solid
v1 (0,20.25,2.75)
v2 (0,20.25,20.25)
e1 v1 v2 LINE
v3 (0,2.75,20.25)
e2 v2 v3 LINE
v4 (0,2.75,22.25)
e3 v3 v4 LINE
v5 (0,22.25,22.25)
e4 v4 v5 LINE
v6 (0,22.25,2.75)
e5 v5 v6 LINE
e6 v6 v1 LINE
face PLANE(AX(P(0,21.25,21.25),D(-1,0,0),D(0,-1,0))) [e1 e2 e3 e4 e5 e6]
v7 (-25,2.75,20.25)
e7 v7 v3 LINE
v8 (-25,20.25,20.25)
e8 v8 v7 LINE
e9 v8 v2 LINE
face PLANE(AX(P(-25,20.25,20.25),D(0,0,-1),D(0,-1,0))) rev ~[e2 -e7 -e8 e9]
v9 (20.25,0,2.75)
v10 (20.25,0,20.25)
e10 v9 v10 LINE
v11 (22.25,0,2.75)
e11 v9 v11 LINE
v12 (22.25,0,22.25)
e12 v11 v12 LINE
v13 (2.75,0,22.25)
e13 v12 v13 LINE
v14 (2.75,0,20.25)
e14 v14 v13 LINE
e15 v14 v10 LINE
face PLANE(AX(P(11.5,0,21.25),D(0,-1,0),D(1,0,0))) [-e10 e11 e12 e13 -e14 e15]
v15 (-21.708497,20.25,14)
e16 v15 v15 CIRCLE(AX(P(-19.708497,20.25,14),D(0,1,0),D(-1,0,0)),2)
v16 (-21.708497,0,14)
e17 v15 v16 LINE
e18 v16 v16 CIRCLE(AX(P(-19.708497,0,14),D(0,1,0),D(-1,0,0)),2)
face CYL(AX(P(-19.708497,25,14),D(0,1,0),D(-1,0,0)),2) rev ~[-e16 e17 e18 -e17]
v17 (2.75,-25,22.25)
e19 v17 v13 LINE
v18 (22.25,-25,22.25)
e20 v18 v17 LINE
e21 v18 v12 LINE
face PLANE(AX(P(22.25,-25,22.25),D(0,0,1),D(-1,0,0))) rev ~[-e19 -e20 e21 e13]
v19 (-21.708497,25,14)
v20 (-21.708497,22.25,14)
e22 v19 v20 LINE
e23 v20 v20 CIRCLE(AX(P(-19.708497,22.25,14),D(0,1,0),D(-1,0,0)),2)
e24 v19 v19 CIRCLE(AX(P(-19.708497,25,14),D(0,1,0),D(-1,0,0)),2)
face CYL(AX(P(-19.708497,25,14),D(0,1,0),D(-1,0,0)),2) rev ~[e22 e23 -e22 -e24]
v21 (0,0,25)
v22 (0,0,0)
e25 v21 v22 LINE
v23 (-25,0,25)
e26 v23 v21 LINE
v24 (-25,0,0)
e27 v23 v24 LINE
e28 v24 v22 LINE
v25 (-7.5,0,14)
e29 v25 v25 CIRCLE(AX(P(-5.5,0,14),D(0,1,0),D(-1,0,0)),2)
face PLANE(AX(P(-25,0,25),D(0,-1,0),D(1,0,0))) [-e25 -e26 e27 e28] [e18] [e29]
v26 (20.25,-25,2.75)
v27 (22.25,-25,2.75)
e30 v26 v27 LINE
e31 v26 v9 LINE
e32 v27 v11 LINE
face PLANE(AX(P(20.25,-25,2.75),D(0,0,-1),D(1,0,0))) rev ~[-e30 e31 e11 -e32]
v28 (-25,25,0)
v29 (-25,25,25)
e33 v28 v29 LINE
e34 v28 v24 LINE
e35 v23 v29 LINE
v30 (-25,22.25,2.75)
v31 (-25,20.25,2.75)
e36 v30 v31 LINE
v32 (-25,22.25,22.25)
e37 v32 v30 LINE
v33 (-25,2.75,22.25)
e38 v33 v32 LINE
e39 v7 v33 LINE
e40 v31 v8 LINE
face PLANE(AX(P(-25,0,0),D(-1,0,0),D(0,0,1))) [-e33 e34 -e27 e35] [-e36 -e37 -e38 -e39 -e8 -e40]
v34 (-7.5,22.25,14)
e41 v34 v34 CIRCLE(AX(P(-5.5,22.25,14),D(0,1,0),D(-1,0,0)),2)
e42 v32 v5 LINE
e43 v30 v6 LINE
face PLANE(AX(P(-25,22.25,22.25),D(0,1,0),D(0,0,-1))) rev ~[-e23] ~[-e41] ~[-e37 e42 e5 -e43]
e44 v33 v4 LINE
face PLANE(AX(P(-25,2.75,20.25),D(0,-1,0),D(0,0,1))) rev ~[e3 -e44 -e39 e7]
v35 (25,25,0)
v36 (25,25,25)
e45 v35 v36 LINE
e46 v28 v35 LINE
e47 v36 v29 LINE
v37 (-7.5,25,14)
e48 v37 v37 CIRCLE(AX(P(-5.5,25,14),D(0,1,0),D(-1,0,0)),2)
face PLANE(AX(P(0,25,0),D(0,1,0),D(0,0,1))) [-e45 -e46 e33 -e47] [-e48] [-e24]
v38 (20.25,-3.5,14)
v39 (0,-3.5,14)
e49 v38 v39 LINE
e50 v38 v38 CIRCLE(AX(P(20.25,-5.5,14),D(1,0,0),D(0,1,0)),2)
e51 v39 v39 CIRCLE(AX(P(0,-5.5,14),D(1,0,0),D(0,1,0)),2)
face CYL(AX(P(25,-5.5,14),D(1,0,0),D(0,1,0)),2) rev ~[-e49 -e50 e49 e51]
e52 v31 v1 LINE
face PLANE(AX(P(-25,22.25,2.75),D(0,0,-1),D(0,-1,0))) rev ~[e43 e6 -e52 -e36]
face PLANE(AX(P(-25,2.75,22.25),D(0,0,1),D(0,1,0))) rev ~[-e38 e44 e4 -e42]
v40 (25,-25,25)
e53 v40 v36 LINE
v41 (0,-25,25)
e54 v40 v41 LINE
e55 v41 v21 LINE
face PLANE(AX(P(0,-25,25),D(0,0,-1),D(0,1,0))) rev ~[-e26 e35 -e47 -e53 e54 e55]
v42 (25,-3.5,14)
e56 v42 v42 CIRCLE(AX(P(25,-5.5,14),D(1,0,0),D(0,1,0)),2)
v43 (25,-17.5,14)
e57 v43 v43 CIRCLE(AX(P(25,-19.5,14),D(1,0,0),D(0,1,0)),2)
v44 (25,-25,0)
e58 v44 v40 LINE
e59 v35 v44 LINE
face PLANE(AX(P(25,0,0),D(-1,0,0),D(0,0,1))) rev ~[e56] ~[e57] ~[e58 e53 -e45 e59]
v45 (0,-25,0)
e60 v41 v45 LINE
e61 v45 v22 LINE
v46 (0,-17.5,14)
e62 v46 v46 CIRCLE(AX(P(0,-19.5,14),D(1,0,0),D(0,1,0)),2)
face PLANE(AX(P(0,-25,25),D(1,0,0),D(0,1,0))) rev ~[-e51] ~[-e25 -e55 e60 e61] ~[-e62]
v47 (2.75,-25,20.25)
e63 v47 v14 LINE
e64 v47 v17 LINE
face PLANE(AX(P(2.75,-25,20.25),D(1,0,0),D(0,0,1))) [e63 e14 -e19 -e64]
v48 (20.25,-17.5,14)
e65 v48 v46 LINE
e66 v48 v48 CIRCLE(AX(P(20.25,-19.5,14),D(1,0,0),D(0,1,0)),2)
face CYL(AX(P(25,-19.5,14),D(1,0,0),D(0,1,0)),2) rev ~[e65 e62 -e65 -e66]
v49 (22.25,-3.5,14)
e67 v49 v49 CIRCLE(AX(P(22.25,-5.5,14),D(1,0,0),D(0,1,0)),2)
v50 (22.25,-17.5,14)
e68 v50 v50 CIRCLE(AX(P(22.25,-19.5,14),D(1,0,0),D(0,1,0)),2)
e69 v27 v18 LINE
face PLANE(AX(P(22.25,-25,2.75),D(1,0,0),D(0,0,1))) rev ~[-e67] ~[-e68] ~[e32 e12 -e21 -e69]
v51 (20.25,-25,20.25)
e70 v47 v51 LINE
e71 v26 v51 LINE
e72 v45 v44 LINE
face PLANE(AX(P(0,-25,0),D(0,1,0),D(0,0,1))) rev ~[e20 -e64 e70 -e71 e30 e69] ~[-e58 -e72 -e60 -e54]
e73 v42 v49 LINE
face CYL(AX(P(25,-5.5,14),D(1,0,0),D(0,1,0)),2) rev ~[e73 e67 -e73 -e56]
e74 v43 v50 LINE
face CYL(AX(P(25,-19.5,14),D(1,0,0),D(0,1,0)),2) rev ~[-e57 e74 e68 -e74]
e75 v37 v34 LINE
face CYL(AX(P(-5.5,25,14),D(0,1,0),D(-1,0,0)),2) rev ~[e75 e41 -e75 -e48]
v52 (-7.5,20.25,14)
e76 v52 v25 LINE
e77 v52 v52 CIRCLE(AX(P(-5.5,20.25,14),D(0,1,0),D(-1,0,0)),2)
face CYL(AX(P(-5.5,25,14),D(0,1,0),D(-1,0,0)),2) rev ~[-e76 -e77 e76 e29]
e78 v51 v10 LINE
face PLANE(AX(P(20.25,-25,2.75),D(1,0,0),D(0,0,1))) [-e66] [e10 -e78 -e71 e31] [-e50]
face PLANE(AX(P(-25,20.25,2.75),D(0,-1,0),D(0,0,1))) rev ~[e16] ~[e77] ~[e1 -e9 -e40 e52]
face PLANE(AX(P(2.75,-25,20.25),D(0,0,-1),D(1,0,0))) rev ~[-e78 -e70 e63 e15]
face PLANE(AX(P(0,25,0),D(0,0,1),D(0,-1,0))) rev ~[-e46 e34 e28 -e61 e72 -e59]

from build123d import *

# Parameters (mm, degrees)
F0_W      = 25
F0_H      = 25
F1_DEPTH  = 25
F2_DEPTH  = 25
F3_DEPTH  = 25
F4_W      = 25
F4_H      = 25
F5_DEPTH  = 25
F6_W      = 17.5
F6_H      = 2
F6_W_2    = 2
F6_H_2    = 17.5
F7_DEPTH  = 25
F8_W      = 2
F8_H      = 2
F8_W_2    = 17.5
F8_H_2    = 17.5
F9_DEPTH  = 25
F10_R     = 2
F11_DEPTH = 25
F12_R     = 2
F13_DEPTH = 25


# Not quite as in the source:
# - a feature names something its author has since deleted; it is built from what else it names


with BuildPart() as f1:
    # F0 (on Top) → F1 (new body)
    with BuildSketch(Plane.XY):
        with Locations((12.5, 12.5)):
            Rectangle(F0_W, F0_H)
    extrude(amount=F1_DEPTH)

    # F2 (add): a face of the model
    f2_faces = [f1.faces().sort_by_distance(p)[0] for p in [
        (12.5, 0, 12.5),
    ]]
    extrude(f2_faces, amount=F2_DEPTH)

    # F3 (add): a face of the model
    f3_faces = [f1.faces().sort_by_distance(p)[0] for p in [
        (0, 0, 12.5),
    ]]
    extrude(f3_faces, amount=F3_DEPTH)

    # F4 (on face) → F5 (cut)
    with BuildSketch(Plane.XY.offset(25)):
        with Locations((-12.5, -12.5)):
            Rectangle(F4_W, F4_H)
    extrude(amount=-F5_DEPTH, mode=Mode.SUBTRACT)

    # F6 (on face) → F7 (cut)
    with BuildSketch(Plane.XZ.offset(25)):
        with Locations((11.5, 21.25)):
            Rectangle(F6_W, F6_H)
        with Locations((21.25, 21.25)):
            Rectangle(F6_W_2, F6_H)
        with Locations((21.25, 11.5)):
            Rectangle(F6_W_2, F6_H_2)
    extrude(amount=-F7_DEPTH, mode=Mode.SUBTRACT)

    # F8 (on face) → F9 (cut)
    with BuildSketch(Plane(origin=(-25, 0, 0), x_dir=(0, -1, 0), z_dir=(-1, 0, 0))):
        with Locations((-21.25, 21.25)):
            Rectangle(F8_W, F8_H)
        with Locations((-11.5, 21.25)):
            Rectangle(F8_W_2, F8_H)
        with Locations((-21.25, 11.5)):
            Rectangle(F8_W, F8_H_2)
    extrude(amount=-F9_DEPTH, mode=Mode.SUBTRACT)

    # F10 (on face) → F11 (cut)
    with BuildSketch(Plane(origin=(0, 25, 0), x_dir=(-1, 0, 0), z_dir=(0, 1, 0))):
        with Locations((19.7084973779, 14)):
            Circle(F10_R)
        with Locations((5.5, 14)):
            Circle(F10_R)
    extrude(amount=-F11_DEPTH, mode=Mode.SUBTRACT)

    # F12 (on face) → F13 (cut)
    with BuildSketch(Plane.YZ.offset(25)):
        with Locations((-19.5, 14)):
            Circle(F12_R)
        with Locations((-5.5, 14)):
            Circle(F12_R)
    extrude(amount=-F13_DEPTH, mode=Mode.SUBTRACT)


solid = f1.part
